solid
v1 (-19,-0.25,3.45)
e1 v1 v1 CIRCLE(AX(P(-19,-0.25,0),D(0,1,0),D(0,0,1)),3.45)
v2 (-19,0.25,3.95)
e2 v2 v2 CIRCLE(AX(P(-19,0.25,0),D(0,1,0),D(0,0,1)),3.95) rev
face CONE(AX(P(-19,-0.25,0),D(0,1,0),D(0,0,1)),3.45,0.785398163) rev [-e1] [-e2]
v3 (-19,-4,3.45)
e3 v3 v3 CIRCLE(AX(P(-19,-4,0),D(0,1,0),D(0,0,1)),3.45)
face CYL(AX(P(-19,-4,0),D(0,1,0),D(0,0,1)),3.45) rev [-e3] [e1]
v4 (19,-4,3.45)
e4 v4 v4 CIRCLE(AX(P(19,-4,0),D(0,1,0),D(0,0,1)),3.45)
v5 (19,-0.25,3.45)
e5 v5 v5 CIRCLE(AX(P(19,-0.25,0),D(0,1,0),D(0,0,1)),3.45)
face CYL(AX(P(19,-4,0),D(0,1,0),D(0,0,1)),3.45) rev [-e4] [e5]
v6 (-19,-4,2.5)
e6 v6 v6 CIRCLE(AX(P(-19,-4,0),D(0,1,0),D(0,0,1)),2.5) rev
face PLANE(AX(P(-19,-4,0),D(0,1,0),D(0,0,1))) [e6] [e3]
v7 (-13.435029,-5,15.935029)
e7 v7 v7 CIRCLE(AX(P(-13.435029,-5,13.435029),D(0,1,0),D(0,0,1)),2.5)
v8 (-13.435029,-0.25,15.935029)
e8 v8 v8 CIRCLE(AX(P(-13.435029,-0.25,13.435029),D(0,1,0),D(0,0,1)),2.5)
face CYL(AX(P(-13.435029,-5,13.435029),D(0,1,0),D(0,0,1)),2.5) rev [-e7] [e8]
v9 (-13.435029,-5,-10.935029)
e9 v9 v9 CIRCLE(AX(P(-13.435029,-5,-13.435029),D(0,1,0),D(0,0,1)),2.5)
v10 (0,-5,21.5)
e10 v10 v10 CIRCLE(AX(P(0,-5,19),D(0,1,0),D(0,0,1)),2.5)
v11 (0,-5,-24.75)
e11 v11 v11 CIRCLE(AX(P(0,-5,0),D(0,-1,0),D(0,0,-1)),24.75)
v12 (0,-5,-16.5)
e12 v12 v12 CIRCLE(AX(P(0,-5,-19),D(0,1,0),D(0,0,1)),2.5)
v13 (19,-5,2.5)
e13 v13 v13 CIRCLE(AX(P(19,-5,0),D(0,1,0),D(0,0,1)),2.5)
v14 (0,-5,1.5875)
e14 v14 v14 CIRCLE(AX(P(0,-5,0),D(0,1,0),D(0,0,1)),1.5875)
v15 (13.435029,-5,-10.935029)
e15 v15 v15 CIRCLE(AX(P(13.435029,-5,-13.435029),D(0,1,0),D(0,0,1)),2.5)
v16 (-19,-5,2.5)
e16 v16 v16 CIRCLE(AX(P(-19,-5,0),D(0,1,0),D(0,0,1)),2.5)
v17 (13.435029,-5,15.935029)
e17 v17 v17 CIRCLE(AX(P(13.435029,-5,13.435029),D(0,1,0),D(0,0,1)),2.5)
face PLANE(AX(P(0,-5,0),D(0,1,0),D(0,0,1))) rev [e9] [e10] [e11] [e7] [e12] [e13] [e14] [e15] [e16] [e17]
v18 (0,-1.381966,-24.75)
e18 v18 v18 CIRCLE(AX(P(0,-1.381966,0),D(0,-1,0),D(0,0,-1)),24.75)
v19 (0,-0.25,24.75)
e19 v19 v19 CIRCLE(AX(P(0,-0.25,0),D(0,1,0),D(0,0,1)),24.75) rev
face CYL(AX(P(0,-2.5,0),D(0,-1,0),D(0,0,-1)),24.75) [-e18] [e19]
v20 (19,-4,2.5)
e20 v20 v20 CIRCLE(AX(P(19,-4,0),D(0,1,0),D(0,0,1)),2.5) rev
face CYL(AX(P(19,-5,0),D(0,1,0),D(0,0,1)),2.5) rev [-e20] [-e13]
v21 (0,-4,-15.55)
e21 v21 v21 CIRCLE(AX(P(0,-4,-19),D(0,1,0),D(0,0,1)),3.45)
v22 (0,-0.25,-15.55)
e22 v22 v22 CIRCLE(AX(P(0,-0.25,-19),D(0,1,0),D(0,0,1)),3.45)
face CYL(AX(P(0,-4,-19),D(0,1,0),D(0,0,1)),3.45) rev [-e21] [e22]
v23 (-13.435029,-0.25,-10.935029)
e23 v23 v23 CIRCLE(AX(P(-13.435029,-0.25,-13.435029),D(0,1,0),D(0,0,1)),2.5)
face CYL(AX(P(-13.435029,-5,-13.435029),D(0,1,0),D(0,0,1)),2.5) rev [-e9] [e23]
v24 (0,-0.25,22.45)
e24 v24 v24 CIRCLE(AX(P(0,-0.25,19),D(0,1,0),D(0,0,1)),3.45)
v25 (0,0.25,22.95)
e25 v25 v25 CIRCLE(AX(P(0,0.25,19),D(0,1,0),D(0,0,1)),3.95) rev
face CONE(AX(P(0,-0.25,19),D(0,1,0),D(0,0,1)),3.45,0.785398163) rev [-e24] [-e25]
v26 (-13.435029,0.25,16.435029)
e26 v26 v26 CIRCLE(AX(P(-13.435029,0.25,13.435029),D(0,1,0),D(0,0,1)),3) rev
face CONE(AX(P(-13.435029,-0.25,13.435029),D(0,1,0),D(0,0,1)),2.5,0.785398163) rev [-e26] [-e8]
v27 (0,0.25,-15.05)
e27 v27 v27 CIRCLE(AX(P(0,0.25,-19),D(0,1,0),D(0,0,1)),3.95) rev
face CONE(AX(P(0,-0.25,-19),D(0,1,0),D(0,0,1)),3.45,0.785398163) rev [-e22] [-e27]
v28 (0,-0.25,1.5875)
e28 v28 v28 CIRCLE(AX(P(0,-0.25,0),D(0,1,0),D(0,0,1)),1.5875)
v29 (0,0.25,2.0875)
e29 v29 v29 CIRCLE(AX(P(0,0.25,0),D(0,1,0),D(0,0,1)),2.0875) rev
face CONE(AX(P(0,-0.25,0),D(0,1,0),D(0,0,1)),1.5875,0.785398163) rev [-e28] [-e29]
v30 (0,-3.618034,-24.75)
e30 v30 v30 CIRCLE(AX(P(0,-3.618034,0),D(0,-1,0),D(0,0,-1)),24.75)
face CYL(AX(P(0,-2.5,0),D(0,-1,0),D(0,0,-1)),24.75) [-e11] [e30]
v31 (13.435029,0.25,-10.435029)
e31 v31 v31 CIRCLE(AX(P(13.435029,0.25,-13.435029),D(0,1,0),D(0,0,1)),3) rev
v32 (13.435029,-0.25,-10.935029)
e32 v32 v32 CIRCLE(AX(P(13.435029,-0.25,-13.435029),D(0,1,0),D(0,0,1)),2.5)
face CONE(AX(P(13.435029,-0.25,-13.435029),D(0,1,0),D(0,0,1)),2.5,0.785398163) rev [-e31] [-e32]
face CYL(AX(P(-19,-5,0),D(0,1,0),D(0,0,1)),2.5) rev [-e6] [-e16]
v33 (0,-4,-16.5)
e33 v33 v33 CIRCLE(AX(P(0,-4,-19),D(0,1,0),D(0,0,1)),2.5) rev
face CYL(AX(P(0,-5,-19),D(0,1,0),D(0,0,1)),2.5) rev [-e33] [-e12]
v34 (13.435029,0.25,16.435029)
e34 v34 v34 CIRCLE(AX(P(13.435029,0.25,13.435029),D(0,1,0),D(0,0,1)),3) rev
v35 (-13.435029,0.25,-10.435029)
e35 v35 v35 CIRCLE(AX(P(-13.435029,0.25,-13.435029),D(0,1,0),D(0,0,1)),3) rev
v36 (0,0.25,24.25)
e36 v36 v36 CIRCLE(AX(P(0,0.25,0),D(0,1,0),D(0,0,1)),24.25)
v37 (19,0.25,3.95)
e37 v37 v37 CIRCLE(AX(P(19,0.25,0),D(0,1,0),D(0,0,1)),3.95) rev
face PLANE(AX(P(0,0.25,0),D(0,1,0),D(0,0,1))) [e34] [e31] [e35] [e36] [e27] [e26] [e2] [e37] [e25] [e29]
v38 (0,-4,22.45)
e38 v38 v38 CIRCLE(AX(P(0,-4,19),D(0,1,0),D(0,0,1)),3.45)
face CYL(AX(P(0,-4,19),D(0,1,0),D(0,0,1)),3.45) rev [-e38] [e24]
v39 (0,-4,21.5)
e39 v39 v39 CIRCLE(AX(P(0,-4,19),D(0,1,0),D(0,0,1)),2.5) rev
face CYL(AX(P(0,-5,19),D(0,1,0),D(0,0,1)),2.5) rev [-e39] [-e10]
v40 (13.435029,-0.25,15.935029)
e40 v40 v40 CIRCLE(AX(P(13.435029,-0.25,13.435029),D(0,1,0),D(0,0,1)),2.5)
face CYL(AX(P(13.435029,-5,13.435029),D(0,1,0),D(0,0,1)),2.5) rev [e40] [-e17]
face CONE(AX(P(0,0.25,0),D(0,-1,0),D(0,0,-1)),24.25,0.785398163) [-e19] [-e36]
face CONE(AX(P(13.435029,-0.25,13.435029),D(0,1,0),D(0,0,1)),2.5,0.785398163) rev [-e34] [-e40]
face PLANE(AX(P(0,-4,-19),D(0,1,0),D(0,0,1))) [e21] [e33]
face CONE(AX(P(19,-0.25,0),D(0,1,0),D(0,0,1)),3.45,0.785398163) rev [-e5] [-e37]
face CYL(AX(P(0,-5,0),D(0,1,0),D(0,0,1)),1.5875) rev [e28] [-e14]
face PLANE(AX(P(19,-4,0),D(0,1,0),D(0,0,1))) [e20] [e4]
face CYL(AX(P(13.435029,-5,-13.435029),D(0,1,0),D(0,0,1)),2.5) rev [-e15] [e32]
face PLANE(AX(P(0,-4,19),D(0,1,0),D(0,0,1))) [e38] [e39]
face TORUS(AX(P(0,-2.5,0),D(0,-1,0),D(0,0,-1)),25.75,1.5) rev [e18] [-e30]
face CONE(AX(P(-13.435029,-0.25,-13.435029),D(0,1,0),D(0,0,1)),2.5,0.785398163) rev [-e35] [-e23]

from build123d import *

# Parameters (mm, degrees)
SKETCH2_R           = 23.75
SKETCH2_R_2         = 2.5
SKETCH2_R_3         = 1.5875
BOSS_EXTRUDE2_DEPTH = 5
SKETCH3_R           = 3.45
CUT_EXTRUDE1_DEPTH  = 4
SKETCH5_R           = 2
CUT_EXTRUDE2_DEPTH  = 10
SKETCH6_R           = 4
CUT_EXTRUDE3_DEPTH  = 4
CHAMFER2_SIZE       = 1
SKETCH7_R           = 24.75
SKETCH7_R_2         = 2.5
SKETCH7_R_3         = 1.5875
SKETCH7_R_4         = 3.45
BOSS_EXTRUDE3_DEPTH = 0.25
CHAMFER3_SIZE       = 0.5
CIRPATTERN1_COUNT   = 12


with BuildPart() as part:
    # Sketch2 → Boss-Extrude2 (new body)
    with BuildSketch(Plane(origin=(0, 0, 0), x_dir=(-1, 0, 0), z_dir=(0, 1, 0))):
        with Locations(Location((0, 0, 0), (0, 0, 90))):
            Circle(SKETCH2_R)
        with Locations(Location((-13.435028843, 13.435028843, 0), (0, 0, 90))):
            Circle(SKETCH2_R_2, mode=Mode.SUBTRACT)
        with Locations(Location((13.435028843, 13.435028843, 0), (0, 0, 90))):
            Circle(SKETCH2_R_2, mode=Mode.SUBTRACT)
        with Locations(Location((0, 0, 0), (0, 0, 90))):
            Circle(SKETCH2_R_3, mode=Mode.SUBTRACT)
        with Locations(Location((13.435028843, -13.435028843, 0), (0, 0, 90))):
            Circle(SKETCH2_R_2, mode=Mode.SUBTRACT)
        with Locations(Location((0, 19, 0), (0, 0, 90))):
            Circle(SKETCH2_R_2, mode=Mode.SUBTRACT)
        with Locations(Location((19, 0, 0), (0, 0, 90))):
            Circle(SKETCH2_R_2, mode=Mode.SUBTRACT)
        with Locations(Location((0, -19, 0), (0, 0, 90))):
            Circle(SKETCH2_R_2, mode=Mode.SUBTRACT)
        with Locations(Location((-19, 0, 0), (0, 0, 90))):
            Circle(SKETCH2_R_2, mode=Mode.SUBTRACT)
        with Locations(Location((-13.435028843, -13.435028843, 0), (0, 0, 90))):
            Circle(SKETCH2_R_2, mode=Mode.SUBTRACT)
    extrude(amount=-BOSS_EXTRUDE2_DEPTH)

    # Sketch3 → Cut-Extrude1 (cut)
    with BuildSketch(Plane(origin=(0, 0, 0), x_dir=(1, 0, 0), z_dir=(0, 1, 0))):
        with Locations(Location((0, 19, 0), (0, 0, 270))):
            Circle(SKETCH3_R)
        with Locations(Location((19, 0, 0), (0, 0, 270))):
            Circle(SKETCH3_R)
        with Locations(Location((0, -19, 0), (0, 0, 270))):
            Circle(SKETCH3_R)
        with Locations(Location((-19, 0, 0), (0, 0, 270))):
            Circle(SKETCH3_R)
    extrude(amount=-CUT_EXTRUDE1_DEPTH, mode=Mode.SUBTRACT)

    # Sketch4 → Revolve1 (revolve)
    with BuildSketch(Plane.XY, mode=Mode.PRIVATE) as revolve1_sk:
        with BuildLine():
            Line((-24.75, 0), (-23.75, 0))
            Line((-23.75, 0), (-23.75, -5))
            Line((-23.75, -5), (-24.75, -5))
            Line((-24.75, -5), (-24.75, -3.618033989))
            ThreePointArc((-24.75, -3.618033989), (-24.25, -2.5), (-24.75, -1.381966011))
            Line((-24.75, -1.381966011), (-24.75, 0))
        make_face()
        with BuildLine():
            Line((-26.75, -5), (-26.75, -3.618033989))
            ThreePointArc((-26.75, -3.618033989), (-27.25, -2.5), (-26.75, -1.381966011))
            Line((-26.75, -1.381966011), (-26.75, 0))
            Line((-26.75, 0), (-35, 0))
            Line((-35, 0), (-35, -5))
            Line((-35, -5), (-26.75, -5))
        make_face()
    revolve(revolve1_sk.sketch.rotate(Axis((0, -2.5, 0), (0, 1, 0)), 270), axis=Axis((0, -2.5, 0), (0, 1, 0)))


with BuildPart() as revolve1_piece_1:
    # of the separate pieces the step leaves, piece 1, a body of its own (revolve1_pieces)
    add(part.part.solids().sort_by_distance((13.435028843, 0, -10.935028843))[0])

    # Sketch7 → Boss-Extrude3 (add)
    with BuildSketch(Plane(origin=(0, 0, 0), x_dir=(1, 0, 0), z_dir=(0, 1, 0))):
        with Locations(Location((0, 0, 0), (0, 0, 90))):
            Circle(SKETCH7_R)
        with Locations(Location((13.435028843, 13.435028843, 0), (0, 0, 270))):
            Circle(SKETCH7_R_2, mode=Mode.SUBTRACT)
        with Locations(Location((-13.435028843, 13.435028843, 0), (0, 0, 270))):
            Circle(SKETCH7_R_2, mode=Mode.SUBTRACT)
        with Locations(Location((0, 0, 0), (0, 0, 270))):
            Circle(SKETCH7_R_3, mode=Mode.SUBTRACT)
        with Locations(Location((-13.435028843, -13.435028843, 0), (0, 0, 270))):
            Circle(SKETCH7_R_2, mode=Mode.SUBTRACT)
        with Locations(Location((13.435028843, -13.435028843, 0), (0, 0, 270))):
            Circle(SKETCH7_R_2, mode=Mode.SUBTRACT)
        with Locations(Location((-19, 0, 0), (0, 0, 270))):
            Circle(SKETCH7_R_4, mode=Mode.SUBTRACT)
        with Locations(Location((0, -19, 0), (0, 0, 270))):
            Circle(SKETCH7_R_4, mode=Mode.SUBTRACT)
        with Locations(Location((19, 0, 0), (0, 0, 270))):
            Circle(SKETCH7_R_4, mode=Mode.SUBTRACT)
        with Locations(Location((0, 19, 0), (0, 0, 270))):
            Circle(SKETCH7_R_4, mode=Mode.SUBTRACT)
    extrude(amount=BOSS_EXTRUDE3_DEPTH)

    # Chamfer3
    chamfer3_edges = [revolve1_piece_1.edges().sort_by_distance(p)[0] for p in [
        (0, 0.25, 24.75),
        (13.435028843, 0.25, -15.935028843),
        (-13.435028843, 0.25, -15.935028843),
        (0, 0.25, -1.5875),
        (-13.435028843, 0.25, 10.935028843),
        (13.435028843, 0.25, 10.935028843),
        (-19, 0.25, -3.45),
        (0, 0.25, 15.55),
        (19, 0.25, -3.45),
        (0, 0.25, -22.45),
    ]]
    chamfer(chamfer3_edges, length=CHAMFER3_SIZE)


with BuildPart() as revolve1_piece_2:
    # of the separate pieces the step leaves, piece 2, a body of its own (revolve1_pieces)
    add(part.part.solids().sort_by_distance((0, -5, -26.75))[0])

    # Sketch5 → Cut-Extrude2 (cut)
    with BuildSketch(Plane(origin=(0, 0, 0), x_dir=(1, 0, 0), z_dir=(0, 1, 0))):
        with Locations(Location((0, 32.5, 0), (0, 0, 270))):
            Circle(SKETCH5_R)
        with Locations(Location((32.5, 0, 0), (0, 0, 270))):
            Circle(SKETCH5_R)
        with Locations(Location((0, -32.5, 0), (0, 0, 270))):
            Circle(SKETCH5_R)
        with Locations(Location((-32.5, 0, 0), (0, 0, 270))):
            Circle(SKETCH5_R)
    extrude(amount=-CUT_EXTRUDE2_DEPTH, mode=Mode.SUBTRACT)

    # Sketch6 → Cut-Extrude3 (cut)
    with BuildSketch(Plane(origin=(0, 0, 0), x_dir=(1, 0, 0), z_dir=(0, 1, 0))):
        with Locations((0, -32.5)):
            Circle(SKETCH6_R)
        with Locations((-32.5, 0)):
            Circle(SKETCH6_R)
        with Locations((0, 32.5)):
            Circle(SKETCH6_R)
        with Locations((32.5, 0)):
            Circle(SKETCH6_R)
    extrude(amount=-CUT_EXTRUDE3_DEPTH, mode=Mode.SUBTRACT)

    # Chamfer2
    # the kernel refuses this chamfer: 1 mm, written as the material it takes off along each edge
    with BuildSketch(Plane(origin=(0, 0, 0), x_dir=(0.019114321981189532, 0, 0.9998173046588058), z_dir=(-0.9998173046588058, 0, 0.019114321981189532))) as chamfer2_piece_1:
        Polygon((35 - CHAMFER2_SIZE, 0), (35, -CHAMFER2_SIZE), (35, 0), align=None)
    revolve(axis=Axis((0, 0, 0), (0, 1, 0)), revolution_arc=87.809526646, mode=Mode.SUBTRACT)
    with BuildSketch(Plane(origin=(0, 0, 0), x_dir=(-0.9998173046588067, 0, 0.019114321981147413), z_dir=(-0.019114321981147413, 0, -0.9998173046588067))) as chamfer2_piece_2:
        Polygon((35 - CHAMFER2_SIZE, 0), (35, -CHAMFER2_SIZE), (35, 0), align=None)
    revolve(axis=Axis((0, 0, 0), (0, 1, 0)), revolution_arc=87.809526646, mode=Mode.SUBTRACT)
    with BuildSketch(Plane(origin=(0, 0, 0), x_dir=(-0.019114321981182705, 0, -0.999817304658806), z_dir=(0.999817304658806, 0, -0.019114321981182705))) as chamfer2_piece_3:
        Polygon((35 - CHAMFER2_SIZE, 0), (35, -CHAMFER2_SIZE), (35, 0), align=None)
    revolve(axis=Axis((0, 0, 0), (0, 1, 0)), revolution_arc=87.809526646, mode=Mode.SUBTRACT)
    with BuildSketch(Plane(origin=(0, 0, 32.5), x_dir=(-0.29349569960602556, -1.3653955404004917e-15, 0.9559603936946184), z_dir=(0.9559603936946184, 1.4794691735989965e-15, 0.29349569960602556))) as chamfer2_piece_4:
        Polygon((4 + CHAMFER2_SIZE, 0), (4, CHAMFER2_SIZE), (4, 0), align=None)
    revolve(axis=Axis((0, 0, 32.5), (0, -1, 0)), revolution_arc=325.865290322, mode=Mode.SUBTRACT)
    with BuildSketch(Plane(origin=(-32.5, 0, 0), x_dir=(-0.9559603936947099, -1.386827160904714e-15, -0.2934956996057275), z_dir=(-0.2934956996057275, 7.472387430751279e-15, 0.9559603936947099))) as chamfer2_piece_5:
        Polygon((4 + CHAMFER2_SIZE, 0), (4, CHAMFER2_SIZE), (4, 0), align=None)
    revolve(axis=Axis((-32.5, 0, 0), (0, -1, 0)), revolution_arc=325.865290322, mode=Mode.SUBTRACT)
    with BuildSketch(Plane(origin=(0, 0, 0), x_dir=(0.9998173046588067, 0, -0.0191143219811504), z_dir=(0.0191143219811504, 0, 0.9998173046588067))) as chamfer2_piece_6:
        Polygon((35 - CHAMFER2_SIZE, 0), (35, -CHAMFER2_SIZE), (35, 0), align=None)
    revolve(axis=Axis((0, 0, 0), (0, 1, 0)), revolution_arc=87.809526646, mode=Mode.SUBTRACT)
    with BuildSketch(Plane(origin=(0, 0, -32.5), x_dir=(-0.29349569960600574, -1.3653955404004456e-15, -0.9559603936946244), z_dir=(0.9559603936946244, 1.4794691735989516e-15, -0.29349569960600574))) as chamfer2_piece_7:
        Polygon((4 + CHAMFER2_SIZE, 0), (4, -CHAMFER2_SIZE), (4, 0), align=None)
    revolve(axis=Axis((0, 0, -32.5), (0, 1, 0)), revolution_arc=325.865290322, mode=Mode.SUBTRACT)
    with BuildSketch(Plane(origin=(0, 0, 0), x_dir=(0, 0, -1), z_dir=(1, 0, 0))) as chamfer2_piece_8:
        Polygon((26.75, -CHAMFER2_SIZE), (26.75 + CHAMFER2_SIZE, 0), (26.75, 0), align=None)
    revolve(axis=Axis((0, 0, 0), (0, 1, 0)), mode=Mode.SUBTRACT)
    with BuildSketch(Plane(origin=(32.5, 0, 0), x_dir=(0.9559603936946928, 0, -0.2934956996057833), z_dir=(0.2934956996057833, 0, 0.9559603936946928))) as chamfer2_piece_9:
        Polygon((4 + CHAMFER2_SIZE, 0), (4, -CHAMFER2_SIZE), (4, 0), align=None)
    revolve(axis=Axis((32.5, 0, 0), (0, 1, 0)), revolution_arc=325.865290322, mode=Mode.SUBTRACT)


with BuildPart() as body_3:
    # Sketch8 → Revolve2 (revolve)
    with BuildSketch(Plane.XY):
        with BuildLine():
            Line((25.75, -1), (25.75, -4))
            ThreePointArc((25.75, -4), (24.25, -2.5), (25.75, -1))
        make_face()
    revolve(axis=Axis((25.75, -1, 0), (0, -1, 0)))


with BuildPart() as cirpattern1_1:
    # CirPattern1: pattern copy
    add(body_3.part.rotate(Axis((0, 0, 0), (0, 1, 0)), 1 * 360 / CIRPATTERN1_COUNT))


with BuildPart() as cirpattern1_2:
    # CirPattern1: pattern copy
    add(body_3.part.rotate(Axis((0, 0, 0), (0, 1, 0)), 2 * 360 / CIRPATTERN1_COUNT))


with BuildPart() as cirpattern1_3:
    # CirPattern1: pattern copy
    add(body_3.part.rotate(Axis((0, 0, 0), (0, 1, 0)), 3 * 360 / CIRPATTERN1_COUNT))


with BuildPart() as cirpattern1_4:
    # CirPattern1: pattern copy
    add(body_3.part.rotate(Axis((0, 0, 0), (0, 1, 0)), 4 * 360 / CIRPATTERN1_COUNT))


with BuildPart() as cirpattern1_5:
    # CirPattern1: pattern copy
    add(body_3.part.rotate(Axis((0, 0, 0), (0, 1, 0)), 5 * 360 / CIRPATTERN1_COUNT))


with BuildPart() as cirpattern1_6:
    # CirPattern1: pattern copy
    add(body_3.part.rotate(Axis((0, 0, 0), (0, 1, 0)), 6 * 360 / CIRPATTERN1_COUNT))


with BuildPart() as cirpattern1_7:
    # CirPattern1: pattern copy
    add(body_3.part.rotate(Axis((0, 0, 0), (0, 1, 0)), 7 * 360 / CIRPATTERN1_COUNT))


with BuildPart() as cirpattern1_8:
    # CirPattern1: pattern copy
    add(body_3.part.rotate(Axis((0, 0, 0), (0, 1, 0)), 8 * 360 / CIRPATTERN1_COUNT))


with BuildPart() as cirpattern1_9:
    # CirPattern1: pattern copy
    add(body_3.part.rotate(Axis((0, 0, 0), (0, 1, 0)), 9 * 360 / CIRPATTERN1_COUNT))


with BuildPart() as cirpattern1_10:
    # CirPattern1: pattern copy
    add(body_3.part.rotate(Axis((0, 0, 0), (0, 1, 0)), 10 * 360 / CIRPATTERN1_COUNT))


with BuildPart() as cirpattern1_11:
    # CirPattern1: pattern copy
    add(body_3.part.rotate(Axis((0, 0, 0), (0, 1, 0)), 11 * 360 / CIRPATTERN1_COUNT))


solid = revolve1_piece_1.part
